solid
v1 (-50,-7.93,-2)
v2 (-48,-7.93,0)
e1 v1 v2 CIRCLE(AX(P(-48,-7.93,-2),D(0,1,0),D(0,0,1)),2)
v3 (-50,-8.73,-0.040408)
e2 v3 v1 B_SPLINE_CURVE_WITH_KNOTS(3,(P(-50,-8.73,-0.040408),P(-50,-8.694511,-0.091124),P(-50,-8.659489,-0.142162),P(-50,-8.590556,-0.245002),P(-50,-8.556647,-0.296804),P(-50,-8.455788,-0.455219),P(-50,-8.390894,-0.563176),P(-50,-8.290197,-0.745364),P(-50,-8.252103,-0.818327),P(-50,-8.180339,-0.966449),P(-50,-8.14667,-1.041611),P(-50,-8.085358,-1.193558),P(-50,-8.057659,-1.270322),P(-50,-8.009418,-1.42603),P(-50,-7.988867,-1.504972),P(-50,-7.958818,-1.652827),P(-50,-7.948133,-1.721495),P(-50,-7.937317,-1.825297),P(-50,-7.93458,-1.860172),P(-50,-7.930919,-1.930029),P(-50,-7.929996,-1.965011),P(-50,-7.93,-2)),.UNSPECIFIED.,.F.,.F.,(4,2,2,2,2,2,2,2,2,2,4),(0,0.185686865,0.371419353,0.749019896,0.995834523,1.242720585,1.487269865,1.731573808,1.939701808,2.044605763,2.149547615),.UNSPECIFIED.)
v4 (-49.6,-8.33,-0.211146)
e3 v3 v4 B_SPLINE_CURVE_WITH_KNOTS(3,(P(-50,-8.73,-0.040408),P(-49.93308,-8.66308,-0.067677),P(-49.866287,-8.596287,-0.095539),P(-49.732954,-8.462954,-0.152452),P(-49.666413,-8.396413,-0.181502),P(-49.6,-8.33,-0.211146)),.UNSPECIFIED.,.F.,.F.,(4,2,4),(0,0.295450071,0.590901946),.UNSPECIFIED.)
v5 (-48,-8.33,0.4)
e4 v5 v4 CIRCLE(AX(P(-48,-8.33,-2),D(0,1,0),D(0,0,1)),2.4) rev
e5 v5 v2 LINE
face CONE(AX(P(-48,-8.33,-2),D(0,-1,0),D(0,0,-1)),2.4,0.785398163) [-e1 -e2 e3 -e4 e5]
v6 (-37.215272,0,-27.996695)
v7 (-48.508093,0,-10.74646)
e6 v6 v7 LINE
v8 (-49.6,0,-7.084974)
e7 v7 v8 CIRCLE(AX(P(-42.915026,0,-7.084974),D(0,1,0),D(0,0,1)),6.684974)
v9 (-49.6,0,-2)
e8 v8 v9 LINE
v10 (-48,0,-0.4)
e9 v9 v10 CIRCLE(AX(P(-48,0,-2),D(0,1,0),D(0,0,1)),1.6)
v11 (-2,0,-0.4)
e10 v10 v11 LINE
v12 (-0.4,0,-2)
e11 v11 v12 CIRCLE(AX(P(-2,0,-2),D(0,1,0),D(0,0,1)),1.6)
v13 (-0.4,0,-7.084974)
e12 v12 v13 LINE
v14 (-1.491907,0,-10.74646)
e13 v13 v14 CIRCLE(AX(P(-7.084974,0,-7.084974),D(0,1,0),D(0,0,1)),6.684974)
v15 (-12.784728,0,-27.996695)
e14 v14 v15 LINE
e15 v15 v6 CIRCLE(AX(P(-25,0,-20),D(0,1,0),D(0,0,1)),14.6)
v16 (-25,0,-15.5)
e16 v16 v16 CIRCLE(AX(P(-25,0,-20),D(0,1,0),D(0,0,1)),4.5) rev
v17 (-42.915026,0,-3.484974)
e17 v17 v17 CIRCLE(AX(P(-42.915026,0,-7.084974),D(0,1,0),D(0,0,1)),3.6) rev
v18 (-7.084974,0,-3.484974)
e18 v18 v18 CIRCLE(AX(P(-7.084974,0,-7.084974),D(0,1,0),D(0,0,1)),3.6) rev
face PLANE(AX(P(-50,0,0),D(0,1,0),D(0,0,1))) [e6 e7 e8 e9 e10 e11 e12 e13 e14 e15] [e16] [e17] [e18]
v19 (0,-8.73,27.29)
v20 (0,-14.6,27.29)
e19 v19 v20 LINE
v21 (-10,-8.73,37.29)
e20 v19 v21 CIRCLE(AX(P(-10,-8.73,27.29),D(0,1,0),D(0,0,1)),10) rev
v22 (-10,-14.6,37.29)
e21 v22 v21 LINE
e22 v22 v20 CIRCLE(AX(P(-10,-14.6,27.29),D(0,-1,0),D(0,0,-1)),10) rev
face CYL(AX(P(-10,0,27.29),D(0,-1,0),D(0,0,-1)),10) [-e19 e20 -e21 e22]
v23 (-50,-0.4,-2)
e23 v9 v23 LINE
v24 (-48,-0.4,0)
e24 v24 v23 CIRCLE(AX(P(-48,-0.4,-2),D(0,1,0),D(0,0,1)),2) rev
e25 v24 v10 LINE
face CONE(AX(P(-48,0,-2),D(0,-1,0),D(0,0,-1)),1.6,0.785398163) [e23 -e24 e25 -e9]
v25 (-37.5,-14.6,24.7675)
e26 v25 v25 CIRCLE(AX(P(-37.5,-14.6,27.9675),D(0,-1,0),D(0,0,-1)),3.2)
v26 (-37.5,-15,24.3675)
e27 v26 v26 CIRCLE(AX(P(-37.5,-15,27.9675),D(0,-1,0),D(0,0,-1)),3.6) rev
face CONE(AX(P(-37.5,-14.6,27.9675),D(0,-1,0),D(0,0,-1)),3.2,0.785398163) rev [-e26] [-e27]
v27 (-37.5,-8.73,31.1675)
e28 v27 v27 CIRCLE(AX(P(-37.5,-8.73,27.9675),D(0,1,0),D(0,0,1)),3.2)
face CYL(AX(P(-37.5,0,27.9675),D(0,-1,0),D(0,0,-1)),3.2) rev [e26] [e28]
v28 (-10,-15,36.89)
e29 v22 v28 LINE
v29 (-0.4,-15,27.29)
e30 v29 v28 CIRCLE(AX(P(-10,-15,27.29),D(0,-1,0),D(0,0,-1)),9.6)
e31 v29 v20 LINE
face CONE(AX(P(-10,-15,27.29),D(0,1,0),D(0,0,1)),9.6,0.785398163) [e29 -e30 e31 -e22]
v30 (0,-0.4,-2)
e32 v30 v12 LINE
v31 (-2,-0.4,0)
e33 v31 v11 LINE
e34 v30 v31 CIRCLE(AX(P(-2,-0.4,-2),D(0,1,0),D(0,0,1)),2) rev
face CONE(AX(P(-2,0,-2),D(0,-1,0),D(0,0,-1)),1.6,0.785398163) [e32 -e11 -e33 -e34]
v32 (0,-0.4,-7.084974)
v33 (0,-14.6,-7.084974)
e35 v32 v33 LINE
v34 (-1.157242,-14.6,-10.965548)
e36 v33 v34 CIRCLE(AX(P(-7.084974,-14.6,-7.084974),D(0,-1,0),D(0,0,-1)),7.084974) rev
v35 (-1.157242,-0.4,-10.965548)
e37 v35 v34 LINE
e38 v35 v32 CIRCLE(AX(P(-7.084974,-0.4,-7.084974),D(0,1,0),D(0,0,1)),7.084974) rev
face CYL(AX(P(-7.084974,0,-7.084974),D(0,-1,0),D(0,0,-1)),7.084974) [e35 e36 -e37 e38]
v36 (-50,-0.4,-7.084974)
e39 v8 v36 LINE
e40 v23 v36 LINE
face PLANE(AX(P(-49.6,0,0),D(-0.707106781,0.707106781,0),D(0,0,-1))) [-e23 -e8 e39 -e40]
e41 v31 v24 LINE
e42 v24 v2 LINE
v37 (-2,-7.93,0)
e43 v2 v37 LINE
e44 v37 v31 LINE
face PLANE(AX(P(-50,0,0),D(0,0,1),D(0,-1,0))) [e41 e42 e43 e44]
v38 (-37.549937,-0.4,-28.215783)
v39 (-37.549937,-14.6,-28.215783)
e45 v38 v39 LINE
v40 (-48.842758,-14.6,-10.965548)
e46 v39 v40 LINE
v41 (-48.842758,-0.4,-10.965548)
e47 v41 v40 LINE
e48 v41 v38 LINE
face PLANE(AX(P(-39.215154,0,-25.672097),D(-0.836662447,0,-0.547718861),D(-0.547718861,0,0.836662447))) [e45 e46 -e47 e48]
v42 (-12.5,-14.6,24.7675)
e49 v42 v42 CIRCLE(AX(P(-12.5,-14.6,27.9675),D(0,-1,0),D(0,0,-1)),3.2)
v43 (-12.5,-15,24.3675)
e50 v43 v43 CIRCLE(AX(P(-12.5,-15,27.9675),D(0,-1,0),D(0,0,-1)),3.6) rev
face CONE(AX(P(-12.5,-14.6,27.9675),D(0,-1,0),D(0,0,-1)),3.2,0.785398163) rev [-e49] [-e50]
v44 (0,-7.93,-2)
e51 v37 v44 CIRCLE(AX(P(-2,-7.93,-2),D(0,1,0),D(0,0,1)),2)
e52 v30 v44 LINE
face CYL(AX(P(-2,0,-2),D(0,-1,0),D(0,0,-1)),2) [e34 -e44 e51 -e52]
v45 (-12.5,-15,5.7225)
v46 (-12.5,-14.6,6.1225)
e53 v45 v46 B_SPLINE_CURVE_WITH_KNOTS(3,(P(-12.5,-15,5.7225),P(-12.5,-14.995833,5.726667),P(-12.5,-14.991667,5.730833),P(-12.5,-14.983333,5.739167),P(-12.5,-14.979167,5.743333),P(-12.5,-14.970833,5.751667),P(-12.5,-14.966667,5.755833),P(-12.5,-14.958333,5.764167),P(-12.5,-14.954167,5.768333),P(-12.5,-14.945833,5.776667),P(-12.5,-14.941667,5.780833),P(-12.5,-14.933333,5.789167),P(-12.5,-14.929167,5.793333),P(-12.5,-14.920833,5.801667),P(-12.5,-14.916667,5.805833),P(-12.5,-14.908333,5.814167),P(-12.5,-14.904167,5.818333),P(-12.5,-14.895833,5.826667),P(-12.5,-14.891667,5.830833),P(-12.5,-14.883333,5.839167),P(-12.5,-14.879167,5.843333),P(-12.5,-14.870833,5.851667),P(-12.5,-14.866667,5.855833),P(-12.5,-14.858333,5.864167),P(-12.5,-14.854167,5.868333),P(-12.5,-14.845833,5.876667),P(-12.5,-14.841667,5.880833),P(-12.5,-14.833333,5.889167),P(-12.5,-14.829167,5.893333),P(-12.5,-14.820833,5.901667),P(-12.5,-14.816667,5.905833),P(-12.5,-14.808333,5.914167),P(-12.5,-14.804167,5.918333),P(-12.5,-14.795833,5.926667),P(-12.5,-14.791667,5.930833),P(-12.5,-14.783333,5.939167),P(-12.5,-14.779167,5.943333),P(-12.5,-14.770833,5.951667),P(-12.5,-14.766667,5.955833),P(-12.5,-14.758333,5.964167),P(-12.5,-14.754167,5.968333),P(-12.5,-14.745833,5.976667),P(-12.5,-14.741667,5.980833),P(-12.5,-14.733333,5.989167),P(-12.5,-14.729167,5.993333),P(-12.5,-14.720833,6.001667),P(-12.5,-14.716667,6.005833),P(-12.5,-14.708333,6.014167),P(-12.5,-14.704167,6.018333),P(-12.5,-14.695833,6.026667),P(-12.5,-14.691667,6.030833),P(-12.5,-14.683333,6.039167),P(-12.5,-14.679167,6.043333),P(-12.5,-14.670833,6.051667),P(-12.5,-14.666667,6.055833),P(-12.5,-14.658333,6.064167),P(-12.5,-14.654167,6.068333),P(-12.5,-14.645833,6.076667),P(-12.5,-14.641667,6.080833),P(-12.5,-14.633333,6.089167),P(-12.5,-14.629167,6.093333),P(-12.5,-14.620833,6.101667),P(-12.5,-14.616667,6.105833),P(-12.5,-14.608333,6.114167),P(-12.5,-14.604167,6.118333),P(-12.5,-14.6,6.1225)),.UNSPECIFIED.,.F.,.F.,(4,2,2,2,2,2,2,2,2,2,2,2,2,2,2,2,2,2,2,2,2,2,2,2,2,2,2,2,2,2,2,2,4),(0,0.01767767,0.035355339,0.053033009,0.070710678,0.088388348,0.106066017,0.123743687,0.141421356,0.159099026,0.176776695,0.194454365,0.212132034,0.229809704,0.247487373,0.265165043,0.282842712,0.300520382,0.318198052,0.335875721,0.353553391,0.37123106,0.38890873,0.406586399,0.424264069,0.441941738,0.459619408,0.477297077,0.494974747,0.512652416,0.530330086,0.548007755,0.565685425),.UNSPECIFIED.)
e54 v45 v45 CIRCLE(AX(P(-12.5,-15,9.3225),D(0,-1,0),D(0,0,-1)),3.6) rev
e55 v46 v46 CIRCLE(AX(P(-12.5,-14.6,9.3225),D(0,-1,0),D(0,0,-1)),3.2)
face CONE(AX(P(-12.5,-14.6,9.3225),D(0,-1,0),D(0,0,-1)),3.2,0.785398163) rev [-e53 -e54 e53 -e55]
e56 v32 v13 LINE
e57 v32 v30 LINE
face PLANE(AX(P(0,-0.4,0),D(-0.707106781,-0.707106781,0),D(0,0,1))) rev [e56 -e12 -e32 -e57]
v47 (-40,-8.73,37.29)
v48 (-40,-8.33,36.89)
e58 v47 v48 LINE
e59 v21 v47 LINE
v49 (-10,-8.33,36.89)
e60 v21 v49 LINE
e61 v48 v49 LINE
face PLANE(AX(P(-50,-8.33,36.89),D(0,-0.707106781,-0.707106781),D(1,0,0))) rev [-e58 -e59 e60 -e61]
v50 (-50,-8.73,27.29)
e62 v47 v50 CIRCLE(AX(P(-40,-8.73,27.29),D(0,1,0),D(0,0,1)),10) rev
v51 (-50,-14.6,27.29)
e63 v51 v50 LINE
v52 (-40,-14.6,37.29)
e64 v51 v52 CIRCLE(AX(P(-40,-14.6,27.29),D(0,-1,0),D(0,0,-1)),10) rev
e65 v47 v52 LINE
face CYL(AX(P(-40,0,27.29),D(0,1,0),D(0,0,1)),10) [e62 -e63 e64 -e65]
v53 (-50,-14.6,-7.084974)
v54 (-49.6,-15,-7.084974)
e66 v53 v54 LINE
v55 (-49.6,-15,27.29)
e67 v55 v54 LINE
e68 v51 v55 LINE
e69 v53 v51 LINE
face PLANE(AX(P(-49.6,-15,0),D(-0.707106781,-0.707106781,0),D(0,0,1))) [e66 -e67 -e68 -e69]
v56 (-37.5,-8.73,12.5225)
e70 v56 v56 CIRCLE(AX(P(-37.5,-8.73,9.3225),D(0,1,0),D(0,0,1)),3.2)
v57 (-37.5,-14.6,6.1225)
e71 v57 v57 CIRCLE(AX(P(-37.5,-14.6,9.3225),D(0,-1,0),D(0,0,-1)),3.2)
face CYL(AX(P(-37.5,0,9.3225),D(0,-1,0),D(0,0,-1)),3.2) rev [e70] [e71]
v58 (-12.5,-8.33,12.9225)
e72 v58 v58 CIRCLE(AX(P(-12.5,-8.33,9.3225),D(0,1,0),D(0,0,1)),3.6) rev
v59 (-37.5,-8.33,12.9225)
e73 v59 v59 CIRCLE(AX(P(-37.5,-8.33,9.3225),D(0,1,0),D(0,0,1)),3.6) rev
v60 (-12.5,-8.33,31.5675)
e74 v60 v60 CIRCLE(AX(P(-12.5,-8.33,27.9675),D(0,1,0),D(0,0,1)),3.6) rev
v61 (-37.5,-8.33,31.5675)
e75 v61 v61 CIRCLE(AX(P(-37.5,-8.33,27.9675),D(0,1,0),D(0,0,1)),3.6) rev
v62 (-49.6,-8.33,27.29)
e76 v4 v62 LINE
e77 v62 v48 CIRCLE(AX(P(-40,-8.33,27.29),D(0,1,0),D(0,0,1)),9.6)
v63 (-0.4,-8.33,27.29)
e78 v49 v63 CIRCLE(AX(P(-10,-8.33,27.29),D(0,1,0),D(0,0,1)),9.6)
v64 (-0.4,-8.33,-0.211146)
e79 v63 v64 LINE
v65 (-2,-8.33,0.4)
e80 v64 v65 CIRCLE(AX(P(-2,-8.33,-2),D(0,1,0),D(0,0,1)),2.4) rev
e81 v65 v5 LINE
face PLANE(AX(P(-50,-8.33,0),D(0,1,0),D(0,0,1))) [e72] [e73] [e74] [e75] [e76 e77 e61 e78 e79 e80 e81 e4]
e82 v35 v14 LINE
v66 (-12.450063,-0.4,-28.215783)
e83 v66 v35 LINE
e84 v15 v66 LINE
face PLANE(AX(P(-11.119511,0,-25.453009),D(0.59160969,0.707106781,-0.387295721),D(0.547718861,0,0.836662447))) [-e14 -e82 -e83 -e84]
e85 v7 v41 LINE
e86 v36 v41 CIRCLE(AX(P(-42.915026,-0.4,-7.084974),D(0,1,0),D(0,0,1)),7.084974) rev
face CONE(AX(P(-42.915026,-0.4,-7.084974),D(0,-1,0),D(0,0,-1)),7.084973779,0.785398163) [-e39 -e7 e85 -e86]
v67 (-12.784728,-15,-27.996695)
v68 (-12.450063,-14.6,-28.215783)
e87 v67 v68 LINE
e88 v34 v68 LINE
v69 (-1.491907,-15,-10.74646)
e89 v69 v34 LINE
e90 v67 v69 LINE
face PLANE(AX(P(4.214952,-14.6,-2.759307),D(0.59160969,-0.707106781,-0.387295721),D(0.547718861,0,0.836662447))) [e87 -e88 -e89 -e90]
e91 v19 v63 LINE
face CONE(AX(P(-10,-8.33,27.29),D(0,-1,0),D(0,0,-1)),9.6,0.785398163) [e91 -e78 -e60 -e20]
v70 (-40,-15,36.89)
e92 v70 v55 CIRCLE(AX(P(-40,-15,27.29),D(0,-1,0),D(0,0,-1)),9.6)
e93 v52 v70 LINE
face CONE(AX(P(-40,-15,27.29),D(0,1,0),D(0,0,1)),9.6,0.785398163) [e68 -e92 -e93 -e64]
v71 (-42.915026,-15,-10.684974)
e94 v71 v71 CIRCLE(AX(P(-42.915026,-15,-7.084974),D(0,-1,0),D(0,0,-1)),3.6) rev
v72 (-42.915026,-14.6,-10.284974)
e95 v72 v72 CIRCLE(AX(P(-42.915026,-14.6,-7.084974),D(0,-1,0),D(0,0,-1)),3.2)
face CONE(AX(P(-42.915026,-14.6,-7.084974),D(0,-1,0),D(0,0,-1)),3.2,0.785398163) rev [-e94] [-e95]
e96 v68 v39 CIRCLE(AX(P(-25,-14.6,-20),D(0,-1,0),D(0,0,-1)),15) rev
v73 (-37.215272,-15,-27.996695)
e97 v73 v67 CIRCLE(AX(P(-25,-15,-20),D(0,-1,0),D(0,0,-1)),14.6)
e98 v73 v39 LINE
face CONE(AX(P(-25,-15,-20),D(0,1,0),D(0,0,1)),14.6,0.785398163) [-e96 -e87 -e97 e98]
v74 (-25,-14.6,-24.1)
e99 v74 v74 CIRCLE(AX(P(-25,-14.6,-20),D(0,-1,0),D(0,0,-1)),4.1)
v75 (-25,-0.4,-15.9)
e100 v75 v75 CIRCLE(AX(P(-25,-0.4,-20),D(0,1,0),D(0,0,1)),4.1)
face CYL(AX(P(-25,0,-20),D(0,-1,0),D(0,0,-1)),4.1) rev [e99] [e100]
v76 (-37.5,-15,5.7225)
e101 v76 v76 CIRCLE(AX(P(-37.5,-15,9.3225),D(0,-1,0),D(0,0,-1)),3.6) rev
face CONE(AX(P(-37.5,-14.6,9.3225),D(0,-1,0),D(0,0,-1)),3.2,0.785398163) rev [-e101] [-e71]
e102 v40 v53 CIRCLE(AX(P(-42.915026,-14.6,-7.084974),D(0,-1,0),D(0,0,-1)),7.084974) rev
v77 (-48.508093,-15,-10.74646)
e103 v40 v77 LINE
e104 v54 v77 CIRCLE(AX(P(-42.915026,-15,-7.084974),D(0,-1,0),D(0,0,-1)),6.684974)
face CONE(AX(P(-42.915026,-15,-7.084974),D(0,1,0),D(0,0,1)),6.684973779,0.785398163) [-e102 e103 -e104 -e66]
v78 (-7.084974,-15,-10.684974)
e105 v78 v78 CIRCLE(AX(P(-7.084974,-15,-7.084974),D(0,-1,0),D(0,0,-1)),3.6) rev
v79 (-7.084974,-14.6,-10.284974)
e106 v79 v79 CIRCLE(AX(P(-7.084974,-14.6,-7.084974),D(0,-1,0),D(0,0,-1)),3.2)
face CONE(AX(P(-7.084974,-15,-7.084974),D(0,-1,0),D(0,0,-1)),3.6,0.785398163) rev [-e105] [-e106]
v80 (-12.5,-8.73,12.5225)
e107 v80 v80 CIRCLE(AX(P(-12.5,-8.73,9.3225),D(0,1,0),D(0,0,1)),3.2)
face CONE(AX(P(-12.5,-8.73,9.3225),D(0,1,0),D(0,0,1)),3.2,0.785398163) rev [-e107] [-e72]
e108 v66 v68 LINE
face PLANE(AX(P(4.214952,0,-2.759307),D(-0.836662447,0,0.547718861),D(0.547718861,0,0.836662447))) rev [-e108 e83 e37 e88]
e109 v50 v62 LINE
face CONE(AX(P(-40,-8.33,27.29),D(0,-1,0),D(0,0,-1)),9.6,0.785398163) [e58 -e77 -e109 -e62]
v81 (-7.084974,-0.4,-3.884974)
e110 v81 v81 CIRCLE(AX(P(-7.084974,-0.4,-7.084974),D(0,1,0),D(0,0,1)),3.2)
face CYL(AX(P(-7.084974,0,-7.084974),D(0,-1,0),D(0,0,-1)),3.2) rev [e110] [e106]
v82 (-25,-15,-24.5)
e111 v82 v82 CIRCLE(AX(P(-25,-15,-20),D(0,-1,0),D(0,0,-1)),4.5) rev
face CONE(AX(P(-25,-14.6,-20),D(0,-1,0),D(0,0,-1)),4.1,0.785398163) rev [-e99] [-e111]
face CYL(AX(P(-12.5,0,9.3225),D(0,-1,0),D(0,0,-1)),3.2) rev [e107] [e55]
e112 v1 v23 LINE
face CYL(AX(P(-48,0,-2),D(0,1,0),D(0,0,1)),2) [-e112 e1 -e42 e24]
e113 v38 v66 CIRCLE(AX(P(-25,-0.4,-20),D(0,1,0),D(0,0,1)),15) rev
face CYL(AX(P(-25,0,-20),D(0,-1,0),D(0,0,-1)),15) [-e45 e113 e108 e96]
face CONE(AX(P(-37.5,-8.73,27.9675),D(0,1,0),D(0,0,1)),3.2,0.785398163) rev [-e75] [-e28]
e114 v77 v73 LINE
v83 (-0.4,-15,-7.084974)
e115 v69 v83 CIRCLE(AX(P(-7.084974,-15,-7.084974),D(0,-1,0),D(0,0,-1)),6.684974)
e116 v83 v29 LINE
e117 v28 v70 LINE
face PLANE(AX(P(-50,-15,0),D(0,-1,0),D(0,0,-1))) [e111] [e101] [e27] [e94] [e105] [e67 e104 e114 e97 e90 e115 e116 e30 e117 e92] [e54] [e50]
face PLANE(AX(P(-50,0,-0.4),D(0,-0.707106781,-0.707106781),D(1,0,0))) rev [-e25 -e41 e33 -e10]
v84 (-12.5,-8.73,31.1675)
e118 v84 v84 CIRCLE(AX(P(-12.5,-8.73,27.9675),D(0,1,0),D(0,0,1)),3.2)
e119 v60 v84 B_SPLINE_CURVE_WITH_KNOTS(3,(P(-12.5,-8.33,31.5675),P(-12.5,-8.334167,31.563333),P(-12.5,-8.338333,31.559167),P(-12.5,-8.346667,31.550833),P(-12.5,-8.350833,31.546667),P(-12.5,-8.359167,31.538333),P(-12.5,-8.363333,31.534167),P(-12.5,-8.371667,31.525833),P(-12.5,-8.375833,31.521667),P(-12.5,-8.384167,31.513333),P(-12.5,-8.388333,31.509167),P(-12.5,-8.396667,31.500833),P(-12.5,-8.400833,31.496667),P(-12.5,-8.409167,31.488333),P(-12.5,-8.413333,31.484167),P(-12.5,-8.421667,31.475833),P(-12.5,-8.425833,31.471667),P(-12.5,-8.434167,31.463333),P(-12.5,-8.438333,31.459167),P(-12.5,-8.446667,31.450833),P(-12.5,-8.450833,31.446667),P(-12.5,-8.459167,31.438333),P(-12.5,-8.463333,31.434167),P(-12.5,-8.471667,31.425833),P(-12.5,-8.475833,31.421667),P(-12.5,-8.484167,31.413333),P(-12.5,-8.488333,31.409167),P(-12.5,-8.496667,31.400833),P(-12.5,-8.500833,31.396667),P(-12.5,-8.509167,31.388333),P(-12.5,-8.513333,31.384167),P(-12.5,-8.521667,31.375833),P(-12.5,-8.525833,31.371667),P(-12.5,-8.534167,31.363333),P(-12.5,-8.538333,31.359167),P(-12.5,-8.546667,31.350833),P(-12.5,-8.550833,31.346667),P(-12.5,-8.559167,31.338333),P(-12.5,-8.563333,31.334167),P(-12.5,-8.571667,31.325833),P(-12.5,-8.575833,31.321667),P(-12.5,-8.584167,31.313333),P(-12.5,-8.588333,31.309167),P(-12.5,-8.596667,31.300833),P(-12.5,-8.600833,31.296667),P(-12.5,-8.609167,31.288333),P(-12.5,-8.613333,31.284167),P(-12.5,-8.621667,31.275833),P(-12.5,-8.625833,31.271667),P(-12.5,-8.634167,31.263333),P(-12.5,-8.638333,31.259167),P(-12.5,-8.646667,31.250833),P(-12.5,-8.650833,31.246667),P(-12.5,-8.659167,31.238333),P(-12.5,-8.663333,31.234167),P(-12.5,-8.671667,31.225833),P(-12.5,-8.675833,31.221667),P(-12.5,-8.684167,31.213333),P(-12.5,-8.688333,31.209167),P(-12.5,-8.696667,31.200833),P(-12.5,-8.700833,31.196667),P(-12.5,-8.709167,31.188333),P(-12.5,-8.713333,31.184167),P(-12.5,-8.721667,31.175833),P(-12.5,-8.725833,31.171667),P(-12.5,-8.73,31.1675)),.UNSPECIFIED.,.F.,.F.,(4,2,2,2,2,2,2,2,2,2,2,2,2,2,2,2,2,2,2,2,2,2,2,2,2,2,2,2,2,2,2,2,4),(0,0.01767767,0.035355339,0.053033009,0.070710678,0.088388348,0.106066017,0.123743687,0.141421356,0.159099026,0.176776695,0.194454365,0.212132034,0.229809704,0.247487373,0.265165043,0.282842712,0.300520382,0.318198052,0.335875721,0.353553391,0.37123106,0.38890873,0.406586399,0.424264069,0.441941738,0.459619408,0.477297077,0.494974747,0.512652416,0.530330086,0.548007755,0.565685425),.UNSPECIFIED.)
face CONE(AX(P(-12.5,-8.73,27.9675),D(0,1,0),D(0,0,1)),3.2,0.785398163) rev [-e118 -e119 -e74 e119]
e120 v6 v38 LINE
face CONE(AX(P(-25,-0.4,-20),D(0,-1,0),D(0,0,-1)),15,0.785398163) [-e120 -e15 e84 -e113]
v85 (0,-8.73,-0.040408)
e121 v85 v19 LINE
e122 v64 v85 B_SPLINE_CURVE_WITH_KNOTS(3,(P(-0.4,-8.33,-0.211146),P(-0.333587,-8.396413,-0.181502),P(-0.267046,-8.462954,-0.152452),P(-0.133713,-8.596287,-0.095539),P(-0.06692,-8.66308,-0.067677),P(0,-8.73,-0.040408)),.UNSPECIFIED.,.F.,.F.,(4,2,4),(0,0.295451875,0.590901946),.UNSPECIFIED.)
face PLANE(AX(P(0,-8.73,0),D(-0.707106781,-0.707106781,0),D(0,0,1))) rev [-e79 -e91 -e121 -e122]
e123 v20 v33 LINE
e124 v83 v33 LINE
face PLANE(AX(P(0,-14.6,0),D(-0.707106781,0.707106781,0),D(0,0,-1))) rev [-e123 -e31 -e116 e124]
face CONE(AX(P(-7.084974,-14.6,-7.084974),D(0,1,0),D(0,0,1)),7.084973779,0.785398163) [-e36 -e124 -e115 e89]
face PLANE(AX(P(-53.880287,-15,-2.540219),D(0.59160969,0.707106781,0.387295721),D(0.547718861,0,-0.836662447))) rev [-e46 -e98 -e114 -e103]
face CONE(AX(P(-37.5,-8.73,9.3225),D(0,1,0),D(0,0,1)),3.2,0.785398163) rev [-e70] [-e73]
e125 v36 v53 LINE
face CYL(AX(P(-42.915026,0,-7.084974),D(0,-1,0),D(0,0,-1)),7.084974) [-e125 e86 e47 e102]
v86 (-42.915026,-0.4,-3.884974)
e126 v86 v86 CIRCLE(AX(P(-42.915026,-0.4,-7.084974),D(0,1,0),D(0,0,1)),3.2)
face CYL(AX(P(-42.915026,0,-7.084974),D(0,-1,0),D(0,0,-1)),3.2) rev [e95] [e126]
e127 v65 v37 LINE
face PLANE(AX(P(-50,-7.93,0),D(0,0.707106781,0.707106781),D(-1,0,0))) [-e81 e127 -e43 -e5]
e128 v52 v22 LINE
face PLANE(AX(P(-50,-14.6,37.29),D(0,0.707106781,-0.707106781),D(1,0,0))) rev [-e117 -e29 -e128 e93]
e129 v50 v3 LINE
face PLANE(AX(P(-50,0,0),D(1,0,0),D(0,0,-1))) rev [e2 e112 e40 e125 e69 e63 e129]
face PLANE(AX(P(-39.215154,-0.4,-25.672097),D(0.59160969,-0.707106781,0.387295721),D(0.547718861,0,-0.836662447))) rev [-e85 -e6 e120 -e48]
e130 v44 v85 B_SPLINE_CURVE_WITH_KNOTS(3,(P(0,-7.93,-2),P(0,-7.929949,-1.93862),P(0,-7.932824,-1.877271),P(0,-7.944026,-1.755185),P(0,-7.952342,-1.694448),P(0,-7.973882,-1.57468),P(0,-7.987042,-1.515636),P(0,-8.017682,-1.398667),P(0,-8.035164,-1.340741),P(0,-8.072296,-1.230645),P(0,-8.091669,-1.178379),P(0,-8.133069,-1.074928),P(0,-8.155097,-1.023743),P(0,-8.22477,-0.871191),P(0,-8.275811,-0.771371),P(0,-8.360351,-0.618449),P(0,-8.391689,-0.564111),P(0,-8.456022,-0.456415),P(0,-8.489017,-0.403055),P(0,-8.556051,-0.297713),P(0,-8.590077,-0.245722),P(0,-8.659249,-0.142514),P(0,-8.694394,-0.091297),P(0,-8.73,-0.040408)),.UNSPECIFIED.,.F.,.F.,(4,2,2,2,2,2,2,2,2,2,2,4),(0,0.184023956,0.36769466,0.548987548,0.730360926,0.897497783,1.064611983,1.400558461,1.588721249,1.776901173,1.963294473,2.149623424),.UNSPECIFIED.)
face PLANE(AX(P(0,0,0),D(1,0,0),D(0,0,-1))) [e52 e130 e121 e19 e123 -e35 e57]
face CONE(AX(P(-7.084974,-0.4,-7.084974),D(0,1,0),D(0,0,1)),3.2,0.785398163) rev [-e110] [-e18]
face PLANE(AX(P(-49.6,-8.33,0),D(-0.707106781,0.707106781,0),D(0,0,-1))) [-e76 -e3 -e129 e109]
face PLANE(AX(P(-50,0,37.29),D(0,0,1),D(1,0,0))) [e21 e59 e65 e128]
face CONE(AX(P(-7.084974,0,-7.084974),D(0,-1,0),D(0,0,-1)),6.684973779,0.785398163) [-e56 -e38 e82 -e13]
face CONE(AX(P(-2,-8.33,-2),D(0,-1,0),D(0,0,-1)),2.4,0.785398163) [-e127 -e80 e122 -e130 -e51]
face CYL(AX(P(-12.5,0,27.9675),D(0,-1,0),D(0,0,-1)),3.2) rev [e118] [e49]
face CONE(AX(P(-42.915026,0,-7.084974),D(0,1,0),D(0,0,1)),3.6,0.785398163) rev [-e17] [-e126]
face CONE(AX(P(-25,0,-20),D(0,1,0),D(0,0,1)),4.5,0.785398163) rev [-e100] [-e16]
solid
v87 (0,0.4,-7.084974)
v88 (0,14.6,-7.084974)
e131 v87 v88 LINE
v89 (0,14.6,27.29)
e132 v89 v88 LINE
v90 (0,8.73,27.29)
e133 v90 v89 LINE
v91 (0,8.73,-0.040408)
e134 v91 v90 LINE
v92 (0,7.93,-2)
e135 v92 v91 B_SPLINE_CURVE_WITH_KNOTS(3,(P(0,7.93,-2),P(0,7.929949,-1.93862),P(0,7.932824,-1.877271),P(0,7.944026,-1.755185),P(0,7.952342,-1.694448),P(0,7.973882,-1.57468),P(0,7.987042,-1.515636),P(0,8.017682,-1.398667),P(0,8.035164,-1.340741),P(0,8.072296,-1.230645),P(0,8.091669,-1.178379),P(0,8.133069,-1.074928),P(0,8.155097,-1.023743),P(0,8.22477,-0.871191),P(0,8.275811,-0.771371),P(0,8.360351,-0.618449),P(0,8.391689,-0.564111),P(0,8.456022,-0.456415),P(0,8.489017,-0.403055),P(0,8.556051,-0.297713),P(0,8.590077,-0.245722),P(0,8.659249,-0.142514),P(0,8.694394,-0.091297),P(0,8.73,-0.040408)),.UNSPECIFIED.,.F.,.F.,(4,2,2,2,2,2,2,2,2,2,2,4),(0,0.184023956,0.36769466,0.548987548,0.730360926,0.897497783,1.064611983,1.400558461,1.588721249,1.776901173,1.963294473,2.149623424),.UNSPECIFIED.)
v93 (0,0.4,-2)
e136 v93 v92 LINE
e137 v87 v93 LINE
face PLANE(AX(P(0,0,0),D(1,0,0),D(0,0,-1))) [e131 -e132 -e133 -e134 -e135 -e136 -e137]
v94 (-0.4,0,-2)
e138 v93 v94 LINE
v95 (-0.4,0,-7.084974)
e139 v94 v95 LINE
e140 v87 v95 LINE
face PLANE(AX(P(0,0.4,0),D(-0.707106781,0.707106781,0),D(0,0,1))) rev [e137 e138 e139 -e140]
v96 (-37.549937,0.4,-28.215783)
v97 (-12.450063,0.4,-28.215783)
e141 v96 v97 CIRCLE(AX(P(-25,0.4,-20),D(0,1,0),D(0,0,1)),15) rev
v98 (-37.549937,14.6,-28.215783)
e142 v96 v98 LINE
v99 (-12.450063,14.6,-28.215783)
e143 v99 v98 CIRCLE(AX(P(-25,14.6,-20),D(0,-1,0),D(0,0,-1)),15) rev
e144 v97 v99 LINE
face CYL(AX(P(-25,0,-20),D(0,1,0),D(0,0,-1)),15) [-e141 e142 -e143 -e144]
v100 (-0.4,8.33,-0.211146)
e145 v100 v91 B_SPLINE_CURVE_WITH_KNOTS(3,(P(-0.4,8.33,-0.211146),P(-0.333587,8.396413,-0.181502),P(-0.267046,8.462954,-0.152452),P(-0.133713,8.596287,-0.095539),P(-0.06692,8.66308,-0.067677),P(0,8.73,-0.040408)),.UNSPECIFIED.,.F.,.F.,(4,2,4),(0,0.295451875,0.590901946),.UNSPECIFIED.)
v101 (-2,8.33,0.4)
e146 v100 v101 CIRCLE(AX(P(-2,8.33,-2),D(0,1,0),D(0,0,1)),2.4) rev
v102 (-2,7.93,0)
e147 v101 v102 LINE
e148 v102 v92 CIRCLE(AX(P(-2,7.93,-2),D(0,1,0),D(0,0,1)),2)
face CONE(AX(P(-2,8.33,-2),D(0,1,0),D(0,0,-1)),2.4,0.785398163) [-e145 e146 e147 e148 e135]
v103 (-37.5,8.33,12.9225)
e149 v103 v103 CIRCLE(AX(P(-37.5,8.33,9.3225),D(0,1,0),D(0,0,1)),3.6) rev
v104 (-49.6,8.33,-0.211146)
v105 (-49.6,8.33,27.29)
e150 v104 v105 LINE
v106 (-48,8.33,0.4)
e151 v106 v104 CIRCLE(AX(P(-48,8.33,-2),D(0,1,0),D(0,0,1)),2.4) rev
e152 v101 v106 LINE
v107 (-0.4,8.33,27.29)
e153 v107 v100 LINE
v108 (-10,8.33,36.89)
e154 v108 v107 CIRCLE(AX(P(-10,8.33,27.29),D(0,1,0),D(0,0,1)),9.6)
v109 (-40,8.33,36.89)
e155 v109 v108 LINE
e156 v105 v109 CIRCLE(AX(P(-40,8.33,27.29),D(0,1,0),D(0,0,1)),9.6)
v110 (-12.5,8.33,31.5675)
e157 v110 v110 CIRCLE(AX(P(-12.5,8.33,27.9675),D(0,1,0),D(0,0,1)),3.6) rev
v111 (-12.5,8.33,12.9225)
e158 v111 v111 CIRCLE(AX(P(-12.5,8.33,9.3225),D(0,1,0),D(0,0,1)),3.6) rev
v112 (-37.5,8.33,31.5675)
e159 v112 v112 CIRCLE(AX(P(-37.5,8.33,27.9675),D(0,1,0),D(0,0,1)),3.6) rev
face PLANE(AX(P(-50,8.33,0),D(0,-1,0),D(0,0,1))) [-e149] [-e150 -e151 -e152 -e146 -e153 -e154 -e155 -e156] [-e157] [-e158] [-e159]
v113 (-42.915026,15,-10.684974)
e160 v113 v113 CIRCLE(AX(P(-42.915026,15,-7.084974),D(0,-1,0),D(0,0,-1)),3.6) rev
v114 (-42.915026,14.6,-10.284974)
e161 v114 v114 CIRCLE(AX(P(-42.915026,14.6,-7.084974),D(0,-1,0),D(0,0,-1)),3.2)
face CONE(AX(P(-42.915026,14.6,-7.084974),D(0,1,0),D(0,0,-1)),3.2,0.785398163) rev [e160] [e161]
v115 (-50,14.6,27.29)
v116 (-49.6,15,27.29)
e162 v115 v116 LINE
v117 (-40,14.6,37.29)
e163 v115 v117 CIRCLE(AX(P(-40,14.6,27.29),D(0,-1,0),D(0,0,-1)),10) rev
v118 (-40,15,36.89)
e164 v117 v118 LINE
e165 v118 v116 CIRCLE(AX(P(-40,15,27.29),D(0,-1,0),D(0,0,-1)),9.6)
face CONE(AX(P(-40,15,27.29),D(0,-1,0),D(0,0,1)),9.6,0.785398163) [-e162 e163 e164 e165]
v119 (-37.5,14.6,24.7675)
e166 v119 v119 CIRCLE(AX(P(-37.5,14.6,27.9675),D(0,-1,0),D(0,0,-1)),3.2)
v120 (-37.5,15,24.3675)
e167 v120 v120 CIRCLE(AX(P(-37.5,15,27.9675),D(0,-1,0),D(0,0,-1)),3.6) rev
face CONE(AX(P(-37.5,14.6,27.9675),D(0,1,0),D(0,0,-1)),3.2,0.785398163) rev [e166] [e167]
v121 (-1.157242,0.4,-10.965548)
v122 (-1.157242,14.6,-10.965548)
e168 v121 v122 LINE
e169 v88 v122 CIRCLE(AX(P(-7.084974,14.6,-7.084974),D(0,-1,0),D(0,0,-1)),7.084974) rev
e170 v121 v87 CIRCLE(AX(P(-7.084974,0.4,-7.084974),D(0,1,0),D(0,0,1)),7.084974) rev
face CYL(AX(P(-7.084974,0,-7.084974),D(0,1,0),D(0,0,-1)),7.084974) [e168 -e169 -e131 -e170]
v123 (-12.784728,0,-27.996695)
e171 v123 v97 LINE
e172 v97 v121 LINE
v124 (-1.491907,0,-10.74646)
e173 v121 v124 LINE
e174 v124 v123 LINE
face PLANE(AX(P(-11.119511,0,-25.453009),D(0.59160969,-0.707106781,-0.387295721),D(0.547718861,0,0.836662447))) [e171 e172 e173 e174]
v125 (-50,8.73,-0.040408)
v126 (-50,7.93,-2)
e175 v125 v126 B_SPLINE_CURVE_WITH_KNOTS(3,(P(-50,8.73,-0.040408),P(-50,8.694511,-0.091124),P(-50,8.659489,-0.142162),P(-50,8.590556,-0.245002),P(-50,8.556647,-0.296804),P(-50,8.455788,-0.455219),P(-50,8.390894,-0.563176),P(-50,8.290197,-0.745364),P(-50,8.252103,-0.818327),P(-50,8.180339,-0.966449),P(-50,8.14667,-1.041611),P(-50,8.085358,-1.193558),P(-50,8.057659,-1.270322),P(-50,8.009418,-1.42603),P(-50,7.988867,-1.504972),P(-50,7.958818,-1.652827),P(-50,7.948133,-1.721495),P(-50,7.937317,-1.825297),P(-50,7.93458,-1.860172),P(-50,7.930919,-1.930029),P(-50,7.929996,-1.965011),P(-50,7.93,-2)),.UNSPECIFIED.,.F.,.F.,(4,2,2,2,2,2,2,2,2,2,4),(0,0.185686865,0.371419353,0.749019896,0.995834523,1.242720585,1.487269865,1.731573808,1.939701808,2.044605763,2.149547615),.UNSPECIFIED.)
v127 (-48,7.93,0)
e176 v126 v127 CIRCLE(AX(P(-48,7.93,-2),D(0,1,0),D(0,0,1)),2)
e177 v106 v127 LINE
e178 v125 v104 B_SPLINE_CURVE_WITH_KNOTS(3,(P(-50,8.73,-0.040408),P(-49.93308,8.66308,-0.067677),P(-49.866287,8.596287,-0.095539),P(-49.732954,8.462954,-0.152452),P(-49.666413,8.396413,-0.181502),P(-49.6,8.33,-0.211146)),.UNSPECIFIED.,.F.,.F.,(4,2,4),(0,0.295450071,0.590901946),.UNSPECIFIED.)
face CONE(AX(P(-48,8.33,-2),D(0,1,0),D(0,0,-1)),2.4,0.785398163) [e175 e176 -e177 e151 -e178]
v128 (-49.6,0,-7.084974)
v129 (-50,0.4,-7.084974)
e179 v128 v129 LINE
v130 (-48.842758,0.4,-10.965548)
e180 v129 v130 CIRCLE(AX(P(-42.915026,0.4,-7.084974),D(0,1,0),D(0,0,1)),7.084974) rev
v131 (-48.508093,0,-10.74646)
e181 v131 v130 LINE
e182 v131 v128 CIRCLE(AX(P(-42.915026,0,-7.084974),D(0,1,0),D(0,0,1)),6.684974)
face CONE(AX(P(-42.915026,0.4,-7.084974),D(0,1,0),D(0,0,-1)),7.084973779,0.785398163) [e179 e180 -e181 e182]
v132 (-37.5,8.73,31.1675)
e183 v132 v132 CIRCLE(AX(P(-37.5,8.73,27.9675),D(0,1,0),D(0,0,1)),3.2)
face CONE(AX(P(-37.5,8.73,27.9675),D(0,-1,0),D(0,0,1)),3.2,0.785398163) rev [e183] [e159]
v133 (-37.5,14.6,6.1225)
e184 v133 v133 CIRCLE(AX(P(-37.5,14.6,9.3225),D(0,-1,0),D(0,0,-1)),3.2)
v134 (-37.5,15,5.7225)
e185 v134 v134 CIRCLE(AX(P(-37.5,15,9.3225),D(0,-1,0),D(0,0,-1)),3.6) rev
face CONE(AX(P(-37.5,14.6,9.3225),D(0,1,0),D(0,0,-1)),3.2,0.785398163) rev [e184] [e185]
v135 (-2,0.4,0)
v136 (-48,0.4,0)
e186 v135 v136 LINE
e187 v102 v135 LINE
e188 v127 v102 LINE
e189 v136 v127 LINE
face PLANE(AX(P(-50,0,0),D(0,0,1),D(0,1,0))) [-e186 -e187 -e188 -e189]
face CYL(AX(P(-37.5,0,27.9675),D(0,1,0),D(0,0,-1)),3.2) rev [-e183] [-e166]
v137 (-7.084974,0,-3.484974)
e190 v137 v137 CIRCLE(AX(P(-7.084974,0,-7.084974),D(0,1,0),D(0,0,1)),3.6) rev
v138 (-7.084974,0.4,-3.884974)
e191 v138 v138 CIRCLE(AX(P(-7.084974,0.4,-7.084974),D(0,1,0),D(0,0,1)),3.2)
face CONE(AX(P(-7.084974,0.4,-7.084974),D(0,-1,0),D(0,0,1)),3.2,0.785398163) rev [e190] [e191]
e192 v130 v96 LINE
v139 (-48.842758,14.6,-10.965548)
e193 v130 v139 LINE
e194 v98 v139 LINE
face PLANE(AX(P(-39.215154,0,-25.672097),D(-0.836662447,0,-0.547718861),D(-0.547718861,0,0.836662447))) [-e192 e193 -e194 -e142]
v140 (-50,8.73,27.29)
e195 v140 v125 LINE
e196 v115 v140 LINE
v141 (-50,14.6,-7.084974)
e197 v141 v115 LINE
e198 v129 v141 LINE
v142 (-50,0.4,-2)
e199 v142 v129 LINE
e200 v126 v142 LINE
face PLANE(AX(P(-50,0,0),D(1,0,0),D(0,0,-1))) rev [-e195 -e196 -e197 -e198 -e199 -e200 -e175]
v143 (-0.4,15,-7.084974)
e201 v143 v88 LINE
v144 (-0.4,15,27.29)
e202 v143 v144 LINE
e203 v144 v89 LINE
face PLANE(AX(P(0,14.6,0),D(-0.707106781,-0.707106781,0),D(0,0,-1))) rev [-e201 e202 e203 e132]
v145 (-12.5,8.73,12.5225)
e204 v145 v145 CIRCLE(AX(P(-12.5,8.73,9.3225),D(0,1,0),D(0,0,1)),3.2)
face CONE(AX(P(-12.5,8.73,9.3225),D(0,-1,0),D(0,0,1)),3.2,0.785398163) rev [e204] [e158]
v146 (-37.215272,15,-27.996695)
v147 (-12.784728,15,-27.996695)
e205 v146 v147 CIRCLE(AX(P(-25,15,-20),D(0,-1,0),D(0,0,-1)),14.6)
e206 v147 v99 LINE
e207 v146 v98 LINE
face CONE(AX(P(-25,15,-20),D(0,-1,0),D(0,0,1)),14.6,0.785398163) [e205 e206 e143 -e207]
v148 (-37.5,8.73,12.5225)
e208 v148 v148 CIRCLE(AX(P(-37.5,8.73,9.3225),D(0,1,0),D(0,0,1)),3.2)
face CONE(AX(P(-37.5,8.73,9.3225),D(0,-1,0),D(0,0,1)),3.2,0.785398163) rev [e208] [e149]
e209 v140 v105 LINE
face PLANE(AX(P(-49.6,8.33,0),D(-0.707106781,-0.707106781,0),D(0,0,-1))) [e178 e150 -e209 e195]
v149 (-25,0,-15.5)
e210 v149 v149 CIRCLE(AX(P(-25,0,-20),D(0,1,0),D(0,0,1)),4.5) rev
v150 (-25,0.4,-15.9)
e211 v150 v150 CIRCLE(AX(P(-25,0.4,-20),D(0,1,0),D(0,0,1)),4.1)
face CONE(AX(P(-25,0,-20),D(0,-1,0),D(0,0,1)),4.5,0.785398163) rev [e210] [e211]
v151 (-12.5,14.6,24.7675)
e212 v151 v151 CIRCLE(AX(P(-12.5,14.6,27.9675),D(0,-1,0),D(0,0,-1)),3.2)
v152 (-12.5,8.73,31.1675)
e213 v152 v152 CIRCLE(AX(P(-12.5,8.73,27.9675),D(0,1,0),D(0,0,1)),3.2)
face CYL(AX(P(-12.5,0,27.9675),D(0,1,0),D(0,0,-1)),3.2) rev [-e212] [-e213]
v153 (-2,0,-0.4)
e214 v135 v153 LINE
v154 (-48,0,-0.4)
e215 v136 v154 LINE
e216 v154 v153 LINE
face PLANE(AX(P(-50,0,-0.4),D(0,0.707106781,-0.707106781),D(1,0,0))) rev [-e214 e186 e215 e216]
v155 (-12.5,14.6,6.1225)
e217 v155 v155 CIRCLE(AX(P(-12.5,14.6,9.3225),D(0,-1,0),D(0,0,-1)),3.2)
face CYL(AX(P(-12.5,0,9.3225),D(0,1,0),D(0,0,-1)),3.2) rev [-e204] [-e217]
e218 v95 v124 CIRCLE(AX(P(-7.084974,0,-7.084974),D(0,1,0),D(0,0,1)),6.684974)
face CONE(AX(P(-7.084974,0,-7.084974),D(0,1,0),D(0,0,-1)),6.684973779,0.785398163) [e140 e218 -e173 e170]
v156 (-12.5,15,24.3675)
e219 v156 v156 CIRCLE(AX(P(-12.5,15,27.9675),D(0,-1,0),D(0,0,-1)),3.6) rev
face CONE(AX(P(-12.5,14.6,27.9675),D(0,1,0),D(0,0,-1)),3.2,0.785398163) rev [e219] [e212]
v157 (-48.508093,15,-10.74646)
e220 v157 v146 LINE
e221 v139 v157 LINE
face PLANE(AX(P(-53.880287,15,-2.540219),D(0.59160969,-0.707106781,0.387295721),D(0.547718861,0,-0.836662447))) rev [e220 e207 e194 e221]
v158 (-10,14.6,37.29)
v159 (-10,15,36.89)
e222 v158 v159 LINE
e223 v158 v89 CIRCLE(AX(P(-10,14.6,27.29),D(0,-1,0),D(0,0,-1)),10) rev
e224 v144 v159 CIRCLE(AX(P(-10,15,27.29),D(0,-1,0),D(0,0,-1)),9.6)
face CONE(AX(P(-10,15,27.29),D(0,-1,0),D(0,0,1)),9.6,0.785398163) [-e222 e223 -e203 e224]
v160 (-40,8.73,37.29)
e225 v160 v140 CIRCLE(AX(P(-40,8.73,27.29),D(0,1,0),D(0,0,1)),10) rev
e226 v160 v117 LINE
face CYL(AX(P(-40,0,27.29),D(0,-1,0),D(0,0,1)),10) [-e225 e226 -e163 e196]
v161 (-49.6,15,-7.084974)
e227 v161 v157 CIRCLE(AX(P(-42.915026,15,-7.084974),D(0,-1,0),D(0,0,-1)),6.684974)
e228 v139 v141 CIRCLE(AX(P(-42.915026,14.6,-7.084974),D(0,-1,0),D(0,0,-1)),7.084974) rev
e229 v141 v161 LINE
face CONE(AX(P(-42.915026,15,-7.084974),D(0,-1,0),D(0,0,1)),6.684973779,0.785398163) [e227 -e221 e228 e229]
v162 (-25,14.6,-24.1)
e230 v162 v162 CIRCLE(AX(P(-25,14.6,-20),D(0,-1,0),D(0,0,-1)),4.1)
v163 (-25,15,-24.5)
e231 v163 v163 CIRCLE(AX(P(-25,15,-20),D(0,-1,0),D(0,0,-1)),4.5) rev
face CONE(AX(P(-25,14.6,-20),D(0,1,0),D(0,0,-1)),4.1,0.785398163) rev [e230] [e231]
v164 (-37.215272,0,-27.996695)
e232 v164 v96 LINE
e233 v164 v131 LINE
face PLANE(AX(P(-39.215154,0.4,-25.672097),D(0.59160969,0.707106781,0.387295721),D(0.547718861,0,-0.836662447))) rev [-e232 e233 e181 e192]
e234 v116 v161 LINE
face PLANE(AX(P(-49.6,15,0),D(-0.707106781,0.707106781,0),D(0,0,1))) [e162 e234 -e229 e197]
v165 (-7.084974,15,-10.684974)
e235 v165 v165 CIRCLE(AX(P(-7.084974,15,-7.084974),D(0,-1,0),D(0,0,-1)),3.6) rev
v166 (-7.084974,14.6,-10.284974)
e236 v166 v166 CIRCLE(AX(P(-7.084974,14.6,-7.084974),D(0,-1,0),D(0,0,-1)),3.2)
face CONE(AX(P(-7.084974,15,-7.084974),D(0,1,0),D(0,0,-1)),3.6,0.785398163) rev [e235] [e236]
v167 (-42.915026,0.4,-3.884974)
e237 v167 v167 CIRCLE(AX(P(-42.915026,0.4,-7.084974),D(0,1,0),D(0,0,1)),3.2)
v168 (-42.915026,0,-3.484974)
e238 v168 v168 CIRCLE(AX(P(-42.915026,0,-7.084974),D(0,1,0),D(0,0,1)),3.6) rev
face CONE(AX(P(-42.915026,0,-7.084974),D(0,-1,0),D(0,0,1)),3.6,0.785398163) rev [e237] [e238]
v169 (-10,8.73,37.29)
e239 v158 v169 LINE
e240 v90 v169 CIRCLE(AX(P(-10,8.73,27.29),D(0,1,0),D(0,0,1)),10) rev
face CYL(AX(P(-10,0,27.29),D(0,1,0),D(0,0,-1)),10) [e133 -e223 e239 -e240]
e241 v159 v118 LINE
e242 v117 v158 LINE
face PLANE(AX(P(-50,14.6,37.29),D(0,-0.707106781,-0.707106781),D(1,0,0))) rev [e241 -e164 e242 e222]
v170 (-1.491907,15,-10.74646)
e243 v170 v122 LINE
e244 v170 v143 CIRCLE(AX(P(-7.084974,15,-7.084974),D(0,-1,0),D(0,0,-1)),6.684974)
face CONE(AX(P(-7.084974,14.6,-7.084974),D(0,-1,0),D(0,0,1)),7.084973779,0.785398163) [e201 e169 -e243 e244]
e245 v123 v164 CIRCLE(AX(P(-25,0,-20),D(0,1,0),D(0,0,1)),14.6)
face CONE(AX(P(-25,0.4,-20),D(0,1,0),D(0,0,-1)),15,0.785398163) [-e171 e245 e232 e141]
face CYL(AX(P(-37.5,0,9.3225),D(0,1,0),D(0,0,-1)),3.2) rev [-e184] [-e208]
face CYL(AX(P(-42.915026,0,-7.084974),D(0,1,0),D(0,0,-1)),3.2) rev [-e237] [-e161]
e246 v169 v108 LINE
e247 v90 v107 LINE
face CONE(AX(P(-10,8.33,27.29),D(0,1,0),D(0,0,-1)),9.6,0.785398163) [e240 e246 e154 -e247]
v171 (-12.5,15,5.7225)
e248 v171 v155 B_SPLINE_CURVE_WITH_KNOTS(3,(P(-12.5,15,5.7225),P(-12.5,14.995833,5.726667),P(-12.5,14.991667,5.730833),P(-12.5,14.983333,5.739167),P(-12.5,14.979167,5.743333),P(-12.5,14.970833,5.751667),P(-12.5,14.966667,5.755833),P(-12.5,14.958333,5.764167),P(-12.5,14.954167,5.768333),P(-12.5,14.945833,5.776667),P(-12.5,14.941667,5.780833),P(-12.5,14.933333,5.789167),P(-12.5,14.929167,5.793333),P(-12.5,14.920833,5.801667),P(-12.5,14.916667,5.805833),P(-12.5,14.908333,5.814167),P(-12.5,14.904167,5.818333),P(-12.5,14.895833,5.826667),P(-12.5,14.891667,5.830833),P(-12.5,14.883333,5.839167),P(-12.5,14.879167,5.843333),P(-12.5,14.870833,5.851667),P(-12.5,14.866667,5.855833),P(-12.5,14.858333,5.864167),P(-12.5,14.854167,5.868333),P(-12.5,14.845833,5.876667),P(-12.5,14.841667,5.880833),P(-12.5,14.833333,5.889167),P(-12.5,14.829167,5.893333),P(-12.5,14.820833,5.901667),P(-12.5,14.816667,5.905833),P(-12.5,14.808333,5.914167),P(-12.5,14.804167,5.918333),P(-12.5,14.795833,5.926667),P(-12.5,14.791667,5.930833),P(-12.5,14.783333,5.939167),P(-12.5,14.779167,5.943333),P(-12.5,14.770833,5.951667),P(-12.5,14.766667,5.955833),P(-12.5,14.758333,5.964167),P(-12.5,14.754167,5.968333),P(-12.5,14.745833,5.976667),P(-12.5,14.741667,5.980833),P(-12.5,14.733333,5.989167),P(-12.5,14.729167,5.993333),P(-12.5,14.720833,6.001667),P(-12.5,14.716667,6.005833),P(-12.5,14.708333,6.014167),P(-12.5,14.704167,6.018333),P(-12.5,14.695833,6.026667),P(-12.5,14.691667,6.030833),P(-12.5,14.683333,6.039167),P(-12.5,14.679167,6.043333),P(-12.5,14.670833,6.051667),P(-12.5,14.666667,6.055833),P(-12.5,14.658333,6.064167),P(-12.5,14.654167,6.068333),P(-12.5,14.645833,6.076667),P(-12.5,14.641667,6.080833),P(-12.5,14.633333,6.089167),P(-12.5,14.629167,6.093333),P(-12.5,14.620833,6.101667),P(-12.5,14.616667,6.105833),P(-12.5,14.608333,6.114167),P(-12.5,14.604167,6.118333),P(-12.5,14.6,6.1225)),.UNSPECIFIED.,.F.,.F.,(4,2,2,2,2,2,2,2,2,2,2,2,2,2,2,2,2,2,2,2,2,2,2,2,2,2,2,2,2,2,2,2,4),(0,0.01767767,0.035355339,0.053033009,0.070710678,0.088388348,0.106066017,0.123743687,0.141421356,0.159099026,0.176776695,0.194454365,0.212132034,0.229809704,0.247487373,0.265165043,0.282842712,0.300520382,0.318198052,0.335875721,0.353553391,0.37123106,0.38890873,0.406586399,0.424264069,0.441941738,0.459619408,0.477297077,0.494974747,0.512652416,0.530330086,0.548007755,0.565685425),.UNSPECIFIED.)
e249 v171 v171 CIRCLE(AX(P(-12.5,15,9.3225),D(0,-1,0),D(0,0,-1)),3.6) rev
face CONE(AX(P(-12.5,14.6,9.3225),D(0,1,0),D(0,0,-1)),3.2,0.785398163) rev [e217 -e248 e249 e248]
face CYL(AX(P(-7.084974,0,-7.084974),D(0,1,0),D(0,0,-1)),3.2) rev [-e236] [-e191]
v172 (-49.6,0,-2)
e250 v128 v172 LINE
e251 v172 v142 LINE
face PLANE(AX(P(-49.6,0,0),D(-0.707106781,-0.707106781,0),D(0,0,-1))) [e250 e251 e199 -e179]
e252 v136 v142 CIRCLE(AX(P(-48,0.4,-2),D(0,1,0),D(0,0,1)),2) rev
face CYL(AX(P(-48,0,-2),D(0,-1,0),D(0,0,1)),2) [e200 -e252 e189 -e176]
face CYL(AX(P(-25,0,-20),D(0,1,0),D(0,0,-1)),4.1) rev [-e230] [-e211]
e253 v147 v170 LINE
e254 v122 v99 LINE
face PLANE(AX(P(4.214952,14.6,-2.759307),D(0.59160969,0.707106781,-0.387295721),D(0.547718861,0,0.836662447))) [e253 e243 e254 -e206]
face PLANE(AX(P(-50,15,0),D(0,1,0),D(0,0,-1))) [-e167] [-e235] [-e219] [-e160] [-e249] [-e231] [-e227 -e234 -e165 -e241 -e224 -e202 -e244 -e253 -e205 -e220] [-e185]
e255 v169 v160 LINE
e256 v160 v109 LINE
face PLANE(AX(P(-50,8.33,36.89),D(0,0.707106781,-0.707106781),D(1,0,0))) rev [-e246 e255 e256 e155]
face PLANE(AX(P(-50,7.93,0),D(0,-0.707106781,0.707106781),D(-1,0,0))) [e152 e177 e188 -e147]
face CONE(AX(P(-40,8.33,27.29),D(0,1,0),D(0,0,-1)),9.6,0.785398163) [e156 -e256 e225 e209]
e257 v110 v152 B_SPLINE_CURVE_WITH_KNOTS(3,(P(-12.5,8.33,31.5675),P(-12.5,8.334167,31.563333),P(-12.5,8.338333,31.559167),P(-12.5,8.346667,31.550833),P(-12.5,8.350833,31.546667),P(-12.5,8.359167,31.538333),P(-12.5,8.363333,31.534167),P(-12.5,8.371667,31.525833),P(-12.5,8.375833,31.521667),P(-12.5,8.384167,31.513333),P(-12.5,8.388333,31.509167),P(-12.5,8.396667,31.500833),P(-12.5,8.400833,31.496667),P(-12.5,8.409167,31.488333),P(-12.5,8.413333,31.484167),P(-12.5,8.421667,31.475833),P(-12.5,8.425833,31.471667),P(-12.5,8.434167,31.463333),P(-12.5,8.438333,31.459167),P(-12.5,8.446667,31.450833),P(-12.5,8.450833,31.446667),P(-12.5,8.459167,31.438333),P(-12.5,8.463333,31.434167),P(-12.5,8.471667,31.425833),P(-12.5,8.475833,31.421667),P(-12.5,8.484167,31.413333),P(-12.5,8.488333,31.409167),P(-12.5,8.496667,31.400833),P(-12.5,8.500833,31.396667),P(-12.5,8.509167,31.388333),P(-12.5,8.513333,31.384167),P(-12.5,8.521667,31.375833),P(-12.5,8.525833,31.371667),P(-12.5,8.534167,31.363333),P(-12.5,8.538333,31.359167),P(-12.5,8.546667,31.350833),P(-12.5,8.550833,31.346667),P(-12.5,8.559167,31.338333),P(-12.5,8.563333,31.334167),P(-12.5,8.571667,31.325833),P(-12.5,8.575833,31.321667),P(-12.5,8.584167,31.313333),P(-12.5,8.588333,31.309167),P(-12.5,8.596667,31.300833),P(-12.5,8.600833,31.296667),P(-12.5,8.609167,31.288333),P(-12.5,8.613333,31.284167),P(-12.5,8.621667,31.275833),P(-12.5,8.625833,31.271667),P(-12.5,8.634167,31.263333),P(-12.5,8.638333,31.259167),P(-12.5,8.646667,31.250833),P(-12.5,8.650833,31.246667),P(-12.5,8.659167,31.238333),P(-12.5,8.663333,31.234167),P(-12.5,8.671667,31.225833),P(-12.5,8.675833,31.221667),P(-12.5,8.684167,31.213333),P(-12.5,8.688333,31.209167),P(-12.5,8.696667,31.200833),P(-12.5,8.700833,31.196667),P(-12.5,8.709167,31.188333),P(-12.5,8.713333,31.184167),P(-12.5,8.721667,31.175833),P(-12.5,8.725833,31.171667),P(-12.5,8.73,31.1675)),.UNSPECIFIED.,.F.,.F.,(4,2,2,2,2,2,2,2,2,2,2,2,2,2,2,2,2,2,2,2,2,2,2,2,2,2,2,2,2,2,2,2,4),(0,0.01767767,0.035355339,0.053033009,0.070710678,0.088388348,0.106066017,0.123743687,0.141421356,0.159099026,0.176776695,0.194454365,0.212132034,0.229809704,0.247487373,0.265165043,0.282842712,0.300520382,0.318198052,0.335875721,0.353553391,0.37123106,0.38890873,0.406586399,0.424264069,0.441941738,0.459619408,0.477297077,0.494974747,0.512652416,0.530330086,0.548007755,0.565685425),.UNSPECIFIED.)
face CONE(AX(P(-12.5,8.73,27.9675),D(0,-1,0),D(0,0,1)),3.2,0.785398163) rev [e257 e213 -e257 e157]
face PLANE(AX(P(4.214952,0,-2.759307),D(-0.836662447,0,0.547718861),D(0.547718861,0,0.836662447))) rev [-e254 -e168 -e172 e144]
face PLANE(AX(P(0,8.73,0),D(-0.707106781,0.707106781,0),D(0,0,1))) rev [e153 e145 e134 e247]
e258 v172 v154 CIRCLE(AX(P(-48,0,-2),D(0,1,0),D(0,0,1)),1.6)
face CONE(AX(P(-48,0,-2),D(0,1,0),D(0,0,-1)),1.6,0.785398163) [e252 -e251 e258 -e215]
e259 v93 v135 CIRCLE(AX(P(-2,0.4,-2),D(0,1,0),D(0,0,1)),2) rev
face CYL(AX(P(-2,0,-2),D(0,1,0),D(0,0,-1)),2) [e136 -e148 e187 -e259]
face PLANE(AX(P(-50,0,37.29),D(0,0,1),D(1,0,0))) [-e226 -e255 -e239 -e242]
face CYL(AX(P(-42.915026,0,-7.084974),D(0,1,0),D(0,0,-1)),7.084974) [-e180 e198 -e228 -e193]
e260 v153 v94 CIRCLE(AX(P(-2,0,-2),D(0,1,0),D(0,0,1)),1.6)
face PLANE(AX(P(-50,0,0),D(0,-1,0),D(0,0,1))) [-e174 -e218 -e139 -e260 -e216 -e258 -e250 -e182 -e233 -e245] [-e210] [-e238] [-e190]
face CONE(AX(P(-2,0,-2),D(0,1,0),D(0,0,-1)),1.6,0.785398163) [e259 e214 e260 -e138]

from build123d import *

# Parameters (mm, degrees)
BOSS_EXTRUDE1_DEPTH = 50
SKETCH2_R           = 4.1
SKETCH2_R_2         = 3.2
CUT_EXTRUDE1_DEPTH  = 65.152506576
FILLET1_R           = 10
FILLET2_R           = 2
CHAMFER1_SIZE       = 0.4
CHAMFER2_SIZE       = 0.4
CHAMFER3_SIZE       = 0.4


with BuildPart() as part:
    # Sketch1 → Boss-Extrude1 (new body)
    with BuildSketch(Plane.YZ):
        Polygon((-8.33, 0), (-8.33, 37.29), (-15, 37.29), (-15, -35), (0, -35), (0, 0), align=None)
    extrude(amount=-BOSS_EXTRUDE1_DEPTH)

    # Sketch2 → Cut-Extrude1 (cut, through all)
    with BuildSketch(Plane.XZ.offset(15)):
        with BuildLine():
            ThreePointArc((-12.450063301, -28.215782911), (-17.866864072, -33.195392068), (-25, -35))
            Line((-25, -35), (0, -35))
            Line((0, -35), (0, -7.084973779))
            ThreePointArc((0, -7.084973779), (-0.295471748, -9.109699838), (-1.157242283, -10.965547545))
            Line((-1.157242283, -10.965547545), (-12.450063301, -28.215782911))
        make_face()
        with BuildLine():
            Line((-50, -35), (-25, -35))
            ThreePointArc((-25, -35), (-32.133135928, -33.195392068), (-37.549936699, -28.215782911))
            Line((-37.549936699, -28.215782911), (-48.842757717, -10.965547545))
            ThreePointArc((-48.842757717, -10.965547545), (-49.704528254, -9.109699834), (-50, -7.08497377))
            Line((-50, -7.08497377), (-50, -35))
        make_face()
        with Locations((-25, -20)):
            Circle(SKETCH2_R)
        with Locations((-42.915026221, -7.084973779)):
            Circle(SKETCH2_R_2)
        with Locations((-7.084973779, -7.084973779)):
            Circle(SKETCH2_R_2)
        with Locations((-37.5, 27.9675)):
            Circle(SKETCH2_R_2)
        with Locations((-37.5, 9.3225)):
            Circle(SKETCH2_R_2)
        with Locations((-12.5, 27.9675)):
            Circle(SKETCH2_R_2)
        with Locations((-12.5, 9.3225)):
            Circle(SKETCH2_R_2)
    extrude(amount=-CUT_EXTRUDE1_DEPTH, mode=Mode.SUBTRACT)

    # Fillet1
    fillet1_edges = [part.edges().sort_by_distance(p)[0] for p in [
        (-50, -11.665, 37.29),
        (0, -11.665, 37.29),
    ]]
    fillet(fillet1_edges, radius=FILLET1_R)

    # Fillet2
    fillet2_edges = [part.edges().sort_by_distance(p)[0] for p in [
        (0, -4.165, 0),
        (-50, -4.165, 0),
    ]]
    fillet(fillet2_edges, radius=FILLET2_R)

    # Chamfer1
    chamfer1_edges = [part.edges().sort_by_distance(p)[0] for p in [
        (-40.7, -8.33, 9.3225),
        (-40.7, -8.33, 27.9675),
        (-15.7, -8.33, 27.9675),
        (-15.7, -8.33, 9.3225),
        (-10.284973779, -15, -7.084973779),
        (-40.7, -15, 9.3225),
        (-40.7, -15, 27.9675),
        (-15.7, -15, 27.9675),
        (-15.7, -15, 9.3225),
        (-29.1, -15, -20),
        (-46.115026221, -15, -7.084973779),
        (-2.928932188, -15, 34.361067812),
        (0, -15, 10.102513111),
        (-0.295471748, -15, -9.109699838),
        (-6.803652792, -15, -19.590665228),
        (-25, -15, -35),
        (-43.196347208, -15, -19.590665228),
        (-49.704528254, -15, -9.109699834),
        (-50, -15, 10.102513115),
        (-47.071067812, -15, 34.361067812),
        (-25, -15, 37.29),
        (-49.414213562, 0, -0.585786438),
        (-50, 0, -4.542486885),
        (-49.704528254, 0, -9.109699834),
        (-43.196347208, 0, -19.590665228),
        (-25, 0, -35),
        (-6.803652792, 0, -19.590665228),
        (-0.295471748, 0, -9.109699838),
        (0, 0, -4.542486889),
        (-0.585786438, 0, -0.585786438),
        (-25, 0, 0),
        (-10.284973779, 0, -7.084973779),
        (-29.1, 0, -20),
        (-46.115026221, 0, -7.084973779),
    ]]
    chamfer(chamfer1_edges, length=CHAMFER1_SIZE)

    # Chamfer2
    chamfer2_edges = [part.edges().sort_by_distance(p)[0] for p in [
        (-49.414213562, -8.33, -0.585786438),
        (-0.585786438, -8.33, -0.585786438),
        (-25, -8.33, 0),
    ]]
    chamfer(chamfer2_edges, length=CHAMFER2_SIZE)

    # Chamfer3
    chamfer3_edges = [part.edges().sort_by_distance(p)[0] for p in [
        (-50, -8.33, 13.308324958),
        (0, -8.33, 13.308324958),
        (-47.071067812, -8.33, 34.361067812),
        (-2.928932188, -8.33, 34.361067812),
        (-25, -8.33, 37.29),
    ]]
    chamfer(chamfer3_edges, length=CHAMFER3_SIZE)


with BuildPart() as body_2:
    # Mirror1: mirrored copy
    add(part.part.mirror(Plane(origin=(-50, 0, 0), x_dir=(0, 0, 1), z_dir=(0, 1, 0))))


solid = Compound([part.part, body_2.part])
